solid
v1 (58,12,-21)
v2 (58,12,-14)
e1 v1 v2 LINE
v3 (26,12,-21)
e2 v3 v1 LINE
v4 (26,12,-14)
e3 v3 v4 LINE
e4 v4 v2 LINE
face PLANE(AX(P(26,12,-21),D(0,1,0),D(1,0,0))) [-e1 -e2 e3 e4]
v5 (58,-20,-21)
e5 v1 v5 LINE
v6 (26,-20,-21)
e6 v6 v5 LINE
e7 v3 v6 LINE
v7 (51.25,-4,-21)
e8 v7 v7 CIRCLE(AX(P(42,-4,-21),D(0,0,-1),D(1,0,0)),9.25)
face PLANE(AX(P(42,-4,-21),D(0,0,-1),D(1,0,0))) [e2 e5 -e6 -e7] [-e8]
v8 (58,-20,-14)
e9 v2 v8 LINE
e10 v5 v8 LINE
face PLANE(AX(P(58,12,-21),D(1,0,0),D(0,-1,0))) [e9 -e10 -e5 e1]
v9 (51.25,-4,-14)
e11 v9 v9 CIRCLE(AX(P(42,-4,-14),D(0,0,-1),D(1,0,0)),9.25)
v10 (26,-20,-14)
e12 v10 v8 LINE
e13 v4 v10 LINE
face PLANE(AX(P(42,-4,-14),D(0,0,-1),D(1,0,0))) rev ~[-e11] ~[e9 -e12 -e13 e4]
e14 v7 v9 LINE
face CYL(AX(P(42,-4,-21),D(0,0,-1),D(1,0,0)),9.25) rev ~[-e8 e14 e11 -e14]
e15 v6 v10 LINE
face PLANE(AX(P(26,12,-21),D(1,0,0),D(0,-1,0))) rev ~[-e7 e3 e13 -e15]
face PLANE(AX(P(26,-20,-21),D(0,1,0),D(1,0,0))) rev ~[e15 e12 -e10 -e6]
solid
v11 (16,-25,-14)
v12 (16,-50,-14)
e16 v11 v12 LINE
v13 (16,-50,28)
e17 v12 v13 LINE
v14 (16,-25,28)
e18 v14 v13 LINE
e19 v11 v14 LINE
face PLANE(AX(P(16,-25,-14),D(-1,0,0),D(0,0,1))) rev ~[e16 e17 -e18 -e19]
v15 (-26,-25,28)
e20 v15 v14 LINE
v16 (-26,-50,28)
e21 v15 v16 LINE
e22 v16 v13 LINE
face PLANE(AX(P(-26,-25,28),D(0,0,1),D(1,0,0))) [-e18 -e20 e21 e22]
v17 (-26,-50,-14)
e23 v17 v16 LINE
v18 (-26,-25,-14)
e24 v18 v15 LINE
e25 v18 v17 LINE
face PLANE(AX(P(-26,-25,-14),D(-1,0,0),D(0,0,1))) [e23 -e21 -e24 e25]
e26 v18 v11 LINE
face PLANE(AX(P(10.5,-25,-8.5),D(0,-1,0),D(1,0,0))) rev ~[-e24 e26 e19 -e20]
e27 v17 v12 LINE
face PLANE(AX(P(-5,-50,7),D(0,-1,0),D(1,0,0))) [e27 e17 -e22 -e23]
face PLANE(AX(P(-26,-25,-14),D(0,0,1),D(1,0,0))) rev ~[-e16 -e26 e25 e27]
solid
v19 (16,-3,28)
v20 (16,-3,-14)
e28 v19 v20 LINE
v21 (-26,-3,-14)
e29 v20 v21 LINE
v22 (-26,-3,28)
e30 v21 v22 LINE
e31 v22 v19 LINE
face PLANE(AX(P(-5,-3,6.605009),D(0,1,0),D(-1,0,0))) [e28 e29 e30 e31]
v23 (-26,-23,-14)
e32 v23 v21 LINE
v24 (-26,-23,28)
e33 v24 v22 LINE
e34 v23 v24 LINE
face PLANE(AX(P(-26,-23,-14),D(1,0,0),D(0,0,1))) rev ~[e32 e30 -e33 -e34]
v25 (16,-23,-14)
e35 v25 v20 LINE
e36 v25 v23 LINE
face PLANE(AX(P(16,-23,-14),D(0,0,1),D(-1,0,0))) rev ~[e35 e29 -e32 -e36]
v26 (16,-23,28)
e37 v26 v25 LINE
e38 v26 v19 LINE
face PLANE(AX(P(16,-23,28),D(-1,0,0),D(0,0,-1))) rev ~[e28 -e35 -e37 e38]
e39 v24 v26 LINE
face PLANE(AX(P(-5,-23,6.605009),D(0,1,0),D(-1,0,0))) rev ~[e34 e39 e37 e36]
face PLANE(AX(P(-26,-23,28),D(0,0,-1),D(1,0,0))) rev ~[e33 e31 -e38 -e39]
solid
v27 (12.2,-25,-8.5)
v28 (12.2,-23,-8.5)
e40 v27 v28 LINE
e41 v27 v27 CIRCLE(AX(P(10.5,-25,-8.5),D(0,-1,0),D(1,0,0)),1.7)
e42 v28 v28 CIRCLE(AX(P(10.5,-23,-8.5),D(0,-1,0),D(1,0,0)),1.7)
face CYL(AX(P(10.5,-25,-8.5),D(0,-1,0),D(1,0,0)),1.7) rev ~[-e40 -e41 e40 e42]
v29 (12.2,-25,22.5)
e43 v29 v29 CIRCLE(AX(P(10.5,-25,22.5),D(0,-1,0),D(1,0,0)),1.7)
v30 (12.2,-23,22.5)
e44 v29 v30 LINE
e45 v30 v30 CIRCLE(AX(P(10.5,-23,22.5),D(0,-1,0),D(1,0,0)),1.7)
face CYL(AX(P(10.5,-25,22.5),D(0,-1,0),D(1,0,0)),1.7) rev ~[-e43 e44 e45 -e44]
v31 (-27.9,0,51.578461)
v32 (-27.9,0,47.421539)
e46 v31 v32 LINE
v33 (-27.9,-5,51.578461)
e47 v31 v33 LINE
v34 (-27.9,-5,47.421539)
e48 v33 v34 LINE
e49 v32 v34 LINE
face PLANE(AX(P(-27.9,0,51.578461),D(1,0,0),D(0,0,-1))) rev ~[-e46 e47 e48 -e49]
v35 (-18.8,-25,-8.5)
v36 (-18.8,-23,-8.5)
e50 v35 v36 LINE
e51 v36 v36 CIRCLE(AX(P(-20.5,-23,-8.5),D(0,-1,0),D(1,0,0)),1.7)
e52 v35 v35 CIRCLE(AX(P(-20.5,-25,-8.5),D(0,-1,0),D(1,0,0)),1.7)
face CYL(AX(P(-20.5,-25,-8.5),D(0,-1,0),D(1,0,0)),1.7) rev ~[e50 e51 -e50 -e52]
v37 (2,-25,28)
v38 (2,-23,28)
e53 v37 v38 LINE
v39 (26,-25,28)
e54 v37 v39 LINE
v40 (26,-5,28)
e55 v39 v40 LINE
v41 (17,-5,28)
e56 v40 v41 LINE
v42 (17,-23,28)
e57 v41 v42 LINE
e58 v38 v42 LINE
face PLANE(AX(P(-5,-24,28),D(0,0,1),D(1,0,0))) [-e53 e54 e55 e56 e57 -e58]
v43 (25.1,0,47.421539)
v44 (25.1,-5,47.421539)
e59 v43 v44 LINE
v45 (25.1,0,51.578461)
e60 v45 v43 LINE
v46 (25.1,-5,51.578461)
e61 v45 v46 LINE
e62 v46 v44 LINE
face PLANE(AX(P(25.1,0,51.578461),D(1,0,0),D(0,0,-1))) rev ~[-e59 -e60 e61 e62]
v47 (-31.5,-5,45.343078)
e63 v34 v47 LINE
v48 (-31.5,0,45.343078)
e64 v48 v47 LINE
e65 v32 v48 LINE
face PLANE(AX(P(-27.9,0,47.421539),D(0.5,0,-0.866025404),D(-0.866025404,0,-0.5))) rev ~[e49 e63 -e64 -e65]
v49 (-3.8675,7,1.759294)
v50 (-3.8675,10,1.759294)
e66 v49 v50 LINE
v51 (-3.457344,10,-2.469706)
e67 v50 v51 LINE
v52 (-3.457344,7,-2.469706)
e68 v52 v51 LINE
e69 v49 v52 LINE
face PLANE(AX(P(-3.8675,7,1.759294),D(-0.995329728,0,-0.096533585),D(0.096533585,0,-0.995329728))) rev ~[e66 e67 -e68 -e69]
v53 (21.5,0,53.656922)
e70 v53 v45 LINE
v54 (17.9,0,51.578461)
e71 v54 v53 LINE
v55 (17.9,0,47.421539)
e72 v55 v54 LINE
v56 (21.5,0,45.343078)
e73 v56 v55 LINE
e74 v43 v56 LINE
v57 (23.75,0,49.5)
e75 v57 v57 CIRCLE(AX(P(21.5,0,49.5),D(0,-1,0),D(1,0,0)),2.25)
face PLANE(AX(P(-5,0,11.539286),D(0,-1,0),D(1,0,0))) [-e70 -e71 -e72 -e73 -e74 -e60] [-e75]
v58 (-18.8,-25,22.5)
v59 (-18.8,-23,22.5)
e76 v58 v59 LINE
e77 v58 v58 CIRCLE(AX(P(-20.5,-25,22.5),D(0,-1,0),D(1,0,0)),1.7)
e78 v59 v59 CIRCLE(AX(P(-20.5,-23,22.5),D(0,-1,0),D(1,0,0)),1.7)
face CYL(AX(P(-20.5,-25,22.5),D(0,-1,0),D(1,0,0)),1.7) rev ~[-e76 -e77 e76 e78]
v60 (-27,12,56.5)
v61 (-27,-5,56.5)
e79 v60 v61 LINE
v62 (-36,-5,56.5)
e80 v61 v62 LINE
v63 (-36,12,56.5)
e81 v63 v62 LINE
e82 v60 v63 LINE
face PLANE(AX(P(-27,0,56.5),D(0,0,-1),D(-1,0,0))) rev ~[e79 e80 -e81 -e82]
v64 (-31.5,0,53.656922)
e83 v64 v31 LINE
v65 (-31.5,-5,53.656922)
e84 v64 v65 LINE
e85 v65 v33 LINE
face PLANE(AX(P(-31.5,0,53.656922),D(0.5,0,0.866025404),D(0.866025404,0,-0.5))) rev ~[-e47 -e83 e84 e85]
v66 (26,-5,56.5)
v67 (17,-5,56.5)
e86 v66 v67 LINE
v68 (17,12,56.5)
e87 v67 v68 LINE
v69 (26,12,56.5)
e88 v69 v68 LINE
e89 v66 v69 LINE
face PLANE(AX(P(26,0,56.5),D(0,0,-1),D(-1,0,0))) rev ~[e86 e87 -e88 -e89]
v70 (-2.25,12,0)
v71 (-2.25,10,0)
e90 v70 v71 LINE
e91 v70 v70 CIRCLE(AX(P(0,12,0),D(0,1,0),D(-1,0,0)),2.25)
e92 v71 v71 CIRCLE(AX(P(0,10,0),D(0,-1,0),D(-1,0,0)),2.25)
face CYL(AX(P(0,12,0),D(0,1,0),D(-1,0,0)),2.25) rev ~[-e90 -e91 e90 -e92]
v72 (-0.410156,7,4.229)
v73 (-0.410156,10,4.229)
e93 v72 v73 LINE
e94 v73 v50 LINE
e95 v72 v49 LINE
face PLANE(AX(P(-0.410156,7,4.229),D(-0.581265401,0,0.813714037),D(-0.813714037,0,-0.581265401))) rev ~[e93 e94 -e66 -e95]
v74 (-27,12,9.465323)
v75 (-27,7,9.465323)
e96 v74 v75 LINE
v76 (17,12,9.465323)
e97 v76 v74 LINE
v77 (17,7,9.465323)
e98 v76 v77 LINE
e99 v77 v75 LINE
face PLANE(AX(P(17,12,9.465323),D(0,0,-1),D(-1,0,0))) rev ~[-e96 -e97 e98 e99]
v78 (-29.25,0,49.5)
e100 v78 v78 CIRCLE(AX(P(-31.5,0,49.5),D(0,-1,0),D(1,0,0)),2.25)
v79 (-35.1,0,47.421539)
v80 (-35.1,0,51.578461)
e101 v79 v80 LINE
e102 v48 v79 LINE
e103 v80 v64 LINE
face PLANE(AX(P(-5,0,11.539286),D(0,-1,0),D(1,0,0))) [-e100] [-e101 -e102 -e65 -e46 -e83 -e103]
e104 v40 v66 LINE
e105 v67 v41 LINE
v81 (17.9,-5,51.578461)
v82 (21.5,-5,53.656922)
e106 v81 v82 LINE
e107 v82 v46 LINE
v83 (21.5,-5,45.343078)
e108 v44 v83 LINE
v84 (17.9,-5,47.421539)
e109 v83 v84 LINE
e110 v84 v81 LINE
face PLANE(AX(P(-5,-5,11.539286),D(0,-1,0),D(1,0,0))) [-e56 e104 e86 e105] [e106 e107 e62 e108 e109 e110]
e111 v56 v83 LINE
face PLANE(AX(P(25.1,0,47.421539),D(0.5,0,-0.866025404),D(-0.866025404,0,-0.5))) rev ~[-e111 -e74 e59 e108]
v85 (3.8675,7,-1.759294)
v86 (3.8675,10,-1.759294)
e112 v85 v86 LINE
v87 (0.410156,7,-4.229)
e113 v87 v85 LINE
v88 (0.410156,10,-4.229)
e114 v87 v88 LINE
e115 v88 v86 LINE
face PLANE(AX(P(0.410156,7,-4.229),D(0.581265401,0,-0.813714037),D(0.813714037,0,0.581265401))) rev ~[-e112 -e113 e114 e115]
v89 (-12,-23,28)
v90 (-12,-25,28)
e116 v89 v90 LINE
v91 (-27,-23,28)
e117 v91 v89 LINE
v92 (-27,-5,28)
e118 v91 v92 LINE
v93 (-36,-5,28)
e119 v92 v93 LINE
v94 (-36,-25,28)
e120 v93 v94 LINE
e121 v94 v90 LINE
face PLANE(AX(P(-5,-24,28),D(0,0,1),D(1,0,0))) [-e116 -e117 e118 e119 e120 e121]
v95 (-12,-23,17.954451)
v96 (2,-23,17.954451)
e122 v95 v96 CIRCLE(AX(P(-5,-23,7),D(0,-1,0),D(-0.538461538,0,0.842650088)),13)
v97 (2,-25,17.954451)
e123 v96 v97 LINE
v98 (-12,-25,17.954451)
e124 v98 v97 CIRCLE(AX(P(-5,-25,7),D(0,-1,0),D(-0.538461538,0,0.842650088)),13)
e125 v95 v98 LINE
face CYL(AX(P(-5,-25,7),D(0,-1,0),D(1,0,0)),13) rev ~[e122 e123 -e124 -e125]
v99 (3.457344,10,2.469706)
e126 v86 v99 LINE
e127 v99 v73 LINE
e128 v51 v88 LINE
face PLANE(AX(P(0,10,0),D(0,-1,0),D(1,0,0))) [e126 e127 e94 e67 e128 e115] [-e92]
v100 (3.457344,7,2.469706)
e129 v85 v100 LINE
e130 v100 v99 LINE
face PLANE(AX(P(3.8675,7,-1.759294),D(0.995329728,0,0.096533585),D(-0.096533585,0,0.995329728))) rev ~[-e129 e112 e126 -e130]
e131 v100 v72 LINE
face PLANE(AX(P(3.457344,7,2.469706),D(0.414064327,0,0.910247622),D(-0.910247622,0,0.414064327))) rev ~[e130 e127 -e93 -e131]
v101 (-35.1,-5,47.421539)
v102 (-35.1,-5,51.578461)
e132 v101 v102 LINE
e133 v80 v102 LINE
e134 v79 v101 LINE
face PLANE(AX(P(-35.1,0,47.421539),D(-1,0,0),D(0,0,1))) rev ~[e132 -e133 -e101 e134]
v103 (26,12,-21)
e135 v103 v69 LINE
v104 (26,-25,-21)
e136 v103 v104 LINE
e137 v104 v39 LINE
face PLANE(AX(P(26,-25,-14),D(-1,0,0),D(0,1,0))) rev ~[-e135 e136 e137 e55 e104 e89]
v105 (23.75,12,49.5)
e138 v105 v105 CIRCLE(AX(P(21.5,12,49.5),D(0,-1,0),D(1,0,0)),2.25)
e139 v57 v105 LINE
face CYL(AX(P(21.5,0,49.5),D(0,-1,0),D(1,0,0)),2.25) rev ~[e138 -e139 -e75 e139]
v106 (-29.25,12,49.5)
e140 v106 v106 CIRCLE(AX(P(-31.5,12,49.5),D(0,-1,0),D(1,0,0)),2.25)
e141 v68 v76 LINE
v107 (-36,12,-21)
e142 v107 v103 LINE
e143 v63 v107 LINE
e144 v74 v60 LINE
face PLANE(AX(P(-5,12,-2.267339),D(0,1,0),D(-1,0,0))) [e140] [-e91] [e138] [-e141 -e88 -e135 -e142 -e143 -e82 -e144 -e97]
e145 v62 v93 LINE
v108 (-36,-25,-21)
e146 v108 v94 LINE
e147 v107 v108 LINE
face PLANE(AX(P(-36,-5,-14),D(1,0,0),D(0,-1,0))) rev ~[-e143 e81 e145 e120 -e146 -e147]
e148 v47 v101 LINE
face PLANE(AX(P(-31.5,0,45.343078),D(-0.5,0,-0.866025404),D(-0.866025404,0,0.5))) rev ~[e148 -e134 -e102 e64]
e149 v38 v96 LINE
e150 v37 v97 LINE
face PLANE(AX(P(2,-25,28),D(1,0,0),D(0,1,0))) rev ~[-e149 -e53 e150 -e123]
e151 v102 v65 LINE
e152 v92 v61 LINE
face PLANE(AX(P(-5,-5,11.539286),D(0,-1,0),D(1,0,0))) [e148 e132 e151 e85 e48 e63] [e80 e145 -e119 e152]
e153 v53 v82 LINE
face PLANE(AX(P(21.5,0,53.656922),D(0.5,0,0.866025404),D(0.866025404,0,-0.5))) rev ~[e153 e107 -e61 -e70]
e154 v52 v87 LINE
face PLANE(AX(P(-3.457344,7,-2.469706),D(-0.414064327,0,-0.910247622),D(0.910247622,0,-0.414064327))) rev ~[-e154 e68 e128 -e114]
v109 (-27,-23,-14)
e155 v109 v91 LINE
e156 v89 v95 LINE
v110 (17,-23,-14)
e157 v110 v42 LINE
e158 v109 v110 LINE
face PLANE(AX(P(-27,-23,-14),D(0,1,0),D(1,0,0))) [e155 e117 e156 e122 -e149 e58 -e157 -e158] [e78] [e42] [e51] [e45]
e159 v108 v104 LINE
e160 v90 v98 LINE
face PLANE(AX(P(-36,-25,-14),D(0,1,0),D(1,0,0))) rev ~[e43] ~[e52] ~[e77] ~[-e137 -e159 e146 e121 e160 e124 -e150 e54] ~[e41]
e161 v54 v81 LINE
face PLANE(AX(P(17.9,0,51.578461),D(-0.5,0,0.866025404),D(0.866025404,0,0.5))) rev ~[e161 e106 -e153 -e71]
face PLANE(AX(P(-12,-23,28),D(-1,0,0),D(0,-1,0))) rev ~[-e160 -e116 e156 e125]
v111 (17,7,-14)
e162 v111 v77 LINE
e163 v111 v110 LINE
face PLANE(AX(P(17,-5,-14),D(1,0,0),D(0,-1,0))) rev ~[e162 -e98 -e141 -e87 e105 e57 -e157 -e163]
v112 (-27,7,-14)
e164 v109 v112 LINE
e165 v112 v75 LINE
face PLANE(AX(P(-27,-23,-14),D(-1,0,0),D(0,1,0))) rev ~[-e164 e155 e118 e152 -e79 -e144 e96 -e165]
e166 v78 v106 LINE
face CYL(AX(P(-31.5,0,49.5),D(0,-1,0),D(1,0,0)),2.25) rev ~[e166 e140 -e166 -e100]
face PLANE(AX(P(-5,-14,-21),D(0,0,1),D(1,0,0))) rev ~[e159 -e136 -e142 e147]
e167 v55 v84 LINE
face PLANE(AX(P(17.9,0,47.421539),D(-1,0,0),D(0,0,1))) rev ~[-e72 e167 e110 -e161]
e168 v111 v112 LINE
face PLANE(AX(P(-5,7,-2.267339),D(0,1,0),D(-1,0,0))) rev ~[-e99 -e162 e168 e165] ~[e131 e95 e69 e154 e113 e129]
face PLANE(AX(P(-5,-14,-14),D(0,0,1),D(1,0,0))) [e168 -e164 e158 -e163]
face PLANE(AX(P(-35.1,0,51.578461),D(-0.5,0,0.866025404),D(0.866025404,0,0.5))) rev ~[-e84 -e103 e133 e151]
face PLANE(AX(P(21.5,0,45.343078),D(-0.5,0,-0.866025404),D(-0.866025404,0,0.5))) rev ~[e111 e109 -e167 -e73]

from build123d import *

# Parameters (mm, degrees)
F1_R      = 2.25
F2_DEPTH  = 12
F4_DEPTH  = 5
F5_W      = 44
F5_H      = 18
F5_H_2    = 2
F6_DEPTH  = 7
F7_DEPTH  = 42
F8_R      = 1.7
F8_R_2    = 13
F9_DEPTH  = 2
F11_REACH = 63.1431356237
F12_R     = 1.7
F13_DEPTH = 20
F14_W     = 42
F14_H     = 42
F14_R     = 1.7
F14_R_2   = 13
F15_DEPTH = 25
F16_W     = 32
F16_H     = 32
F16_R     = 9.25
F17_DEPTH = 7
F18_W     = 44
F18_H     = 23.4653228298
F18_R     = 2.25
F19_DEPTH = 5
F20_R     = 2.25
F21_DEPTH = 3


with BuildPart() as f2:
    # F1 (on Front) → F2 (new body)
    with BuildSketch(Plane.XZ):
        Polygon((-27, 56.5), (-36, 56.5), (-36, -21), (26, -21), (26, 56.5), (17, 56.5), (17, -14), (-27, -14), align=None)
        with Locations((-31.5, 49.5)):
            Circle(F1_R, mode=Mode.SUBTRACT)
        with Locations((21.5, 49.5)):
            Circle(F1_R, mode=Mode.SUBTRACT)
    extrude(amount=-F2_DEPTH)

    # F3 (on face) → F4 (join)
    with BuildSketch(Plane.XZ):
        Polygon((-27, -14), (-27, 56.5), (-36, 56.5), (-36, -21), (26, -21), (26, 56.5), (17, 56.5), (17, -14), align=None)
        Polygon((-31.5, 53.6569219382), (-27.9, 51.5784609691), (-27.9, 47.4215390309), (-31.5, 45.3430780618), (-35.1, 47.4215390309), (-35.1, 51.5784609691), align=None, mode=Mode.SUBTRACT)
        Polygon((21.5, 53.6569219382), (25.1, 51.5784609691), (25.1, 47.4215390309), (21.5, 45.3430780618), (17.9, 47.4215390309), (17.9, 51.5784609691), align=None, mode=Mode.SUBTRACT)
    extrude(amount=F4_DEPTH)

    # F5 (on face) → F6 (join, through all)
    with BuildSketch(Plane.XY.offset(-14)):
        with Locations((-5, -14)):
            Rectangle(F5_W, F5_H)
        with Locations((-5, -24)):
            Rectangle(F5_W, F5_H_2)
        Polygon((-27, -23), (-27, -5), (-36, -5), (-36, -25), (-27, -25), align=None)
        Polygon((26, -5), (17, -5), (17, -23), (17, -25), (26, -25), align=None)
    extrude(amount=-F6_DEPTH)

    # F5 (on face) → F7 (join)
    with BuildSketch(Plane.XY.offset(-14)):
        with Locations((-5, -24)):
            Rectangle(F5_W, F5_H_2)
        Polygon((-27, -23), (-27, -5), (-36, -5), (-36, -25), (-27, -25), align=None)
        Polygon((26, -5), (17, -5), (17, -23), (17, -25), (26, -25), align=None)
    extrude(amount=F7_DEPTH)

    # F8 (on face) → F9 (cut, through all)
    with BuildSketch(Plane.XZ.offset(25)):
        with Locations((-20.5, 22.5)):
            Circle(F8_R)
        with Locations((-5, 7)):
            Circle(F8_R_2)
        with Locations((-20.5, -8.5)):
            Circle(F8_R)
        with Locations((10.5, -8.5)):
            Circle(F8_R)
        with Locations((10.5, 22.5)):
            Circle(F8_R)
    extrude(amount=-F9_DEPTH, mode=Mode.SUBTRACT)

    f11_end = f2.faces().sort_by_distance((-18, -24, 7))[0]
    # F10 (on face) → F11 (cut, up to a face of the model that its end follows)
    with BuildSketch(Plane.XY.offset(28)):
        Polygon((2, -23), (-5, -23), (-12, -23), (-12, -25), (2, -25), align=None)
    f11_long = extrude(amount=-F11_REACH, mode=Mode.PRIVATE)
    add(split(f11_long, bisect_by=f11_end, keep=Keep.ALL, mode=Mode.PRIVATE).solids().sort_by_distance((-5, -24, 28))[0], mode=Mode.SUBTRACT)

    # F18 (on face) → F19 (join)
    with BuildSketch(Plane(origin=(0, 12, 0), x_dir=(-1, 0, 0), z_dir=(0, 1, 0))):
        with Locations((5, -2.2673385851)):
            Rectangle(F18_W, F18_H)
        Circle(F18_R, mode=Mode.SUBTRACT)
    extrude(amount=-F19_DEPTH)

    # F20 (on face) → F21 (cut)
    with BuildSketch(Plane.XZ.offset(-7)):
        Polygon((-0.410156085, 4.2290001548), (-3.8674996092, 1.7592944883), (-3.4573435242, -2.4697056666), (0.410156085, -4.2290001548), (3.8674996092, -1.7592944883), (3.4573435242, 2.4697056666), align=None)
        Circle(F20_R, mode=Mode.SUBTRACT)
    extrude(amount=-F21_DEPTH, mode=Mode.SUBTRACT)


with BuildPart() as f13:
    # F12 (on face) → F13 (new body)
    with BuildSketch(Plane(origin=(0, -23, 0), x_dir=(-1, 0, 0), z_dir=(0, 1, 0))):
        with BuildLine():
            Line((-16, -14), (26, -14))
            Line((26, -14), (26, 28))
            Line((26, 28), (12, 28))
            Line((12, 28), (12, 17.9544511501))
            ThreePointArc((12, 17.9544511501), (5, -6), (-2, 17.9544511501))
            Line((-2, 17.9544511501), (-2, 28))
            Line((-2, 28), (-16, 28))
            Line((-16, 28), (-16, -14))
        make_face()
        with Locations((-10.5, -8.5)):
            Circle(F12_R, mode=Mode.SUBTRACT)
        with Locations((20.5, -8.5)):
            Circle(F12_R, mode=Mode.SUBTRACT)
        with Locations((-10.5, 22.5)):
            Circle(F12_R, mode=Mode.SUBTRACT)
        with Locations((20.5, 22.5)):
            Circle(F12_R, mode=Mode.SUBTRACT)
        with BuildLine():
            Line((12, 17.9544511501), (12, 28))
            Line((12, 28), (-2, 28))
            Line((-2, 28), (-2, 17.9544511501))
            ThreePointArc((-2, 17.9544511501), (5, -6), (12, 17.9544511501))
        make_face()
        with Locations((-10.5, 22.5)):
            Circle(F12_R)
        with Locations((20.5, 22.5)):
            Circle(F12_R)
        with Locations((-10.5, -8.5)):
            Circle(F12_R)
        with Locations((20.5, -8.5)):
            Circle(F12_R)
    extrude(amount=F13_DEPTH)


with BuildPart() as f15:
    # F14 (on face) → F15 (new body)
    with BuildSketch(Plane.XZ.offset(25)):
        with Locations((-5, 7)):
            Rectangle(F14_W, F14_H)
        with Locations((-20.5, -8.5)):
            Circle(F14_R, mode=Mode.SUBTRACT)
        with Locations((10.5, -8.5)):
            Circle(F14_R, mode=Mode.SUBTRACT)
        with Locations((-20.5, 22.5)):
            Circle(F14_R, mode=Mode.SUBTRACT)
        with Locations((-5, 7)):
            Circle(F14_R_2, mode=Mode.SUBTRACT)
        with Locations((10.5, 22.5)):
            Circle(F14_R, mode=Mode.SUBTRACT)
    extrude(amount=F15_DEPTH)

    # F8 (on face) → F15, piece 2 (join)
    with BuildSketch(Plane.XZ.offset(25)):
        with Locations((-20.5, 22.5)):
            Circle(F8_R)
    extrude(amount=F15_DEPTH)

    # F8 (on face) → F15, piece 3 (join)
    with BuildSketch(Plane.XZ.offset(25)):
        with Locations((-5, 7)):
            Circle(F8_R_2)
    extrude(amount=F15_DEPTH)

    # F8 (on face) → F15, piece 4 (join)
    with BuildSketch(Plane.XZ.offset(25)):
        with Locations((-20.5, -8.5)):
            Circle(F8_R)
    extrude(amount=F15_DEPTH)

    # F8 (on face) → F15, piece 5 (join)
    with BuildSketch(Plane.XZ.offset(25)):
        with Locations((10.5, 22.5)):
            Circle(F8_R)
    extrude(amount=F15_DEPTH)

    # F8 (on face) → F15, piece 6 (join)
    with BuildSketch(Plane.XZ.offset(25)):
        with Locations((10.5, -8.5)):
            Circle(F8_R)
    extrude(amount=F15_DEPTH)


with BuildPart() as f17:
    # F16 (on face) → F17 (new body, through all)
    with BuildSketch(Plane(origin=(0, 0, -21), x_dir=(1, 0, 0), z_dir=(0, 0, -1))):
        with Locations((42, 4)):
            Rectangle(F16_W, F16_H)
        with Locations((42, 4)):
            Circle(F16_R, mode=Mode.SUBTRACT)
    extrude(amount=-F17_DEPTH)


solid = Compound([f2.part, f13.part, f15.part, f17.part])
